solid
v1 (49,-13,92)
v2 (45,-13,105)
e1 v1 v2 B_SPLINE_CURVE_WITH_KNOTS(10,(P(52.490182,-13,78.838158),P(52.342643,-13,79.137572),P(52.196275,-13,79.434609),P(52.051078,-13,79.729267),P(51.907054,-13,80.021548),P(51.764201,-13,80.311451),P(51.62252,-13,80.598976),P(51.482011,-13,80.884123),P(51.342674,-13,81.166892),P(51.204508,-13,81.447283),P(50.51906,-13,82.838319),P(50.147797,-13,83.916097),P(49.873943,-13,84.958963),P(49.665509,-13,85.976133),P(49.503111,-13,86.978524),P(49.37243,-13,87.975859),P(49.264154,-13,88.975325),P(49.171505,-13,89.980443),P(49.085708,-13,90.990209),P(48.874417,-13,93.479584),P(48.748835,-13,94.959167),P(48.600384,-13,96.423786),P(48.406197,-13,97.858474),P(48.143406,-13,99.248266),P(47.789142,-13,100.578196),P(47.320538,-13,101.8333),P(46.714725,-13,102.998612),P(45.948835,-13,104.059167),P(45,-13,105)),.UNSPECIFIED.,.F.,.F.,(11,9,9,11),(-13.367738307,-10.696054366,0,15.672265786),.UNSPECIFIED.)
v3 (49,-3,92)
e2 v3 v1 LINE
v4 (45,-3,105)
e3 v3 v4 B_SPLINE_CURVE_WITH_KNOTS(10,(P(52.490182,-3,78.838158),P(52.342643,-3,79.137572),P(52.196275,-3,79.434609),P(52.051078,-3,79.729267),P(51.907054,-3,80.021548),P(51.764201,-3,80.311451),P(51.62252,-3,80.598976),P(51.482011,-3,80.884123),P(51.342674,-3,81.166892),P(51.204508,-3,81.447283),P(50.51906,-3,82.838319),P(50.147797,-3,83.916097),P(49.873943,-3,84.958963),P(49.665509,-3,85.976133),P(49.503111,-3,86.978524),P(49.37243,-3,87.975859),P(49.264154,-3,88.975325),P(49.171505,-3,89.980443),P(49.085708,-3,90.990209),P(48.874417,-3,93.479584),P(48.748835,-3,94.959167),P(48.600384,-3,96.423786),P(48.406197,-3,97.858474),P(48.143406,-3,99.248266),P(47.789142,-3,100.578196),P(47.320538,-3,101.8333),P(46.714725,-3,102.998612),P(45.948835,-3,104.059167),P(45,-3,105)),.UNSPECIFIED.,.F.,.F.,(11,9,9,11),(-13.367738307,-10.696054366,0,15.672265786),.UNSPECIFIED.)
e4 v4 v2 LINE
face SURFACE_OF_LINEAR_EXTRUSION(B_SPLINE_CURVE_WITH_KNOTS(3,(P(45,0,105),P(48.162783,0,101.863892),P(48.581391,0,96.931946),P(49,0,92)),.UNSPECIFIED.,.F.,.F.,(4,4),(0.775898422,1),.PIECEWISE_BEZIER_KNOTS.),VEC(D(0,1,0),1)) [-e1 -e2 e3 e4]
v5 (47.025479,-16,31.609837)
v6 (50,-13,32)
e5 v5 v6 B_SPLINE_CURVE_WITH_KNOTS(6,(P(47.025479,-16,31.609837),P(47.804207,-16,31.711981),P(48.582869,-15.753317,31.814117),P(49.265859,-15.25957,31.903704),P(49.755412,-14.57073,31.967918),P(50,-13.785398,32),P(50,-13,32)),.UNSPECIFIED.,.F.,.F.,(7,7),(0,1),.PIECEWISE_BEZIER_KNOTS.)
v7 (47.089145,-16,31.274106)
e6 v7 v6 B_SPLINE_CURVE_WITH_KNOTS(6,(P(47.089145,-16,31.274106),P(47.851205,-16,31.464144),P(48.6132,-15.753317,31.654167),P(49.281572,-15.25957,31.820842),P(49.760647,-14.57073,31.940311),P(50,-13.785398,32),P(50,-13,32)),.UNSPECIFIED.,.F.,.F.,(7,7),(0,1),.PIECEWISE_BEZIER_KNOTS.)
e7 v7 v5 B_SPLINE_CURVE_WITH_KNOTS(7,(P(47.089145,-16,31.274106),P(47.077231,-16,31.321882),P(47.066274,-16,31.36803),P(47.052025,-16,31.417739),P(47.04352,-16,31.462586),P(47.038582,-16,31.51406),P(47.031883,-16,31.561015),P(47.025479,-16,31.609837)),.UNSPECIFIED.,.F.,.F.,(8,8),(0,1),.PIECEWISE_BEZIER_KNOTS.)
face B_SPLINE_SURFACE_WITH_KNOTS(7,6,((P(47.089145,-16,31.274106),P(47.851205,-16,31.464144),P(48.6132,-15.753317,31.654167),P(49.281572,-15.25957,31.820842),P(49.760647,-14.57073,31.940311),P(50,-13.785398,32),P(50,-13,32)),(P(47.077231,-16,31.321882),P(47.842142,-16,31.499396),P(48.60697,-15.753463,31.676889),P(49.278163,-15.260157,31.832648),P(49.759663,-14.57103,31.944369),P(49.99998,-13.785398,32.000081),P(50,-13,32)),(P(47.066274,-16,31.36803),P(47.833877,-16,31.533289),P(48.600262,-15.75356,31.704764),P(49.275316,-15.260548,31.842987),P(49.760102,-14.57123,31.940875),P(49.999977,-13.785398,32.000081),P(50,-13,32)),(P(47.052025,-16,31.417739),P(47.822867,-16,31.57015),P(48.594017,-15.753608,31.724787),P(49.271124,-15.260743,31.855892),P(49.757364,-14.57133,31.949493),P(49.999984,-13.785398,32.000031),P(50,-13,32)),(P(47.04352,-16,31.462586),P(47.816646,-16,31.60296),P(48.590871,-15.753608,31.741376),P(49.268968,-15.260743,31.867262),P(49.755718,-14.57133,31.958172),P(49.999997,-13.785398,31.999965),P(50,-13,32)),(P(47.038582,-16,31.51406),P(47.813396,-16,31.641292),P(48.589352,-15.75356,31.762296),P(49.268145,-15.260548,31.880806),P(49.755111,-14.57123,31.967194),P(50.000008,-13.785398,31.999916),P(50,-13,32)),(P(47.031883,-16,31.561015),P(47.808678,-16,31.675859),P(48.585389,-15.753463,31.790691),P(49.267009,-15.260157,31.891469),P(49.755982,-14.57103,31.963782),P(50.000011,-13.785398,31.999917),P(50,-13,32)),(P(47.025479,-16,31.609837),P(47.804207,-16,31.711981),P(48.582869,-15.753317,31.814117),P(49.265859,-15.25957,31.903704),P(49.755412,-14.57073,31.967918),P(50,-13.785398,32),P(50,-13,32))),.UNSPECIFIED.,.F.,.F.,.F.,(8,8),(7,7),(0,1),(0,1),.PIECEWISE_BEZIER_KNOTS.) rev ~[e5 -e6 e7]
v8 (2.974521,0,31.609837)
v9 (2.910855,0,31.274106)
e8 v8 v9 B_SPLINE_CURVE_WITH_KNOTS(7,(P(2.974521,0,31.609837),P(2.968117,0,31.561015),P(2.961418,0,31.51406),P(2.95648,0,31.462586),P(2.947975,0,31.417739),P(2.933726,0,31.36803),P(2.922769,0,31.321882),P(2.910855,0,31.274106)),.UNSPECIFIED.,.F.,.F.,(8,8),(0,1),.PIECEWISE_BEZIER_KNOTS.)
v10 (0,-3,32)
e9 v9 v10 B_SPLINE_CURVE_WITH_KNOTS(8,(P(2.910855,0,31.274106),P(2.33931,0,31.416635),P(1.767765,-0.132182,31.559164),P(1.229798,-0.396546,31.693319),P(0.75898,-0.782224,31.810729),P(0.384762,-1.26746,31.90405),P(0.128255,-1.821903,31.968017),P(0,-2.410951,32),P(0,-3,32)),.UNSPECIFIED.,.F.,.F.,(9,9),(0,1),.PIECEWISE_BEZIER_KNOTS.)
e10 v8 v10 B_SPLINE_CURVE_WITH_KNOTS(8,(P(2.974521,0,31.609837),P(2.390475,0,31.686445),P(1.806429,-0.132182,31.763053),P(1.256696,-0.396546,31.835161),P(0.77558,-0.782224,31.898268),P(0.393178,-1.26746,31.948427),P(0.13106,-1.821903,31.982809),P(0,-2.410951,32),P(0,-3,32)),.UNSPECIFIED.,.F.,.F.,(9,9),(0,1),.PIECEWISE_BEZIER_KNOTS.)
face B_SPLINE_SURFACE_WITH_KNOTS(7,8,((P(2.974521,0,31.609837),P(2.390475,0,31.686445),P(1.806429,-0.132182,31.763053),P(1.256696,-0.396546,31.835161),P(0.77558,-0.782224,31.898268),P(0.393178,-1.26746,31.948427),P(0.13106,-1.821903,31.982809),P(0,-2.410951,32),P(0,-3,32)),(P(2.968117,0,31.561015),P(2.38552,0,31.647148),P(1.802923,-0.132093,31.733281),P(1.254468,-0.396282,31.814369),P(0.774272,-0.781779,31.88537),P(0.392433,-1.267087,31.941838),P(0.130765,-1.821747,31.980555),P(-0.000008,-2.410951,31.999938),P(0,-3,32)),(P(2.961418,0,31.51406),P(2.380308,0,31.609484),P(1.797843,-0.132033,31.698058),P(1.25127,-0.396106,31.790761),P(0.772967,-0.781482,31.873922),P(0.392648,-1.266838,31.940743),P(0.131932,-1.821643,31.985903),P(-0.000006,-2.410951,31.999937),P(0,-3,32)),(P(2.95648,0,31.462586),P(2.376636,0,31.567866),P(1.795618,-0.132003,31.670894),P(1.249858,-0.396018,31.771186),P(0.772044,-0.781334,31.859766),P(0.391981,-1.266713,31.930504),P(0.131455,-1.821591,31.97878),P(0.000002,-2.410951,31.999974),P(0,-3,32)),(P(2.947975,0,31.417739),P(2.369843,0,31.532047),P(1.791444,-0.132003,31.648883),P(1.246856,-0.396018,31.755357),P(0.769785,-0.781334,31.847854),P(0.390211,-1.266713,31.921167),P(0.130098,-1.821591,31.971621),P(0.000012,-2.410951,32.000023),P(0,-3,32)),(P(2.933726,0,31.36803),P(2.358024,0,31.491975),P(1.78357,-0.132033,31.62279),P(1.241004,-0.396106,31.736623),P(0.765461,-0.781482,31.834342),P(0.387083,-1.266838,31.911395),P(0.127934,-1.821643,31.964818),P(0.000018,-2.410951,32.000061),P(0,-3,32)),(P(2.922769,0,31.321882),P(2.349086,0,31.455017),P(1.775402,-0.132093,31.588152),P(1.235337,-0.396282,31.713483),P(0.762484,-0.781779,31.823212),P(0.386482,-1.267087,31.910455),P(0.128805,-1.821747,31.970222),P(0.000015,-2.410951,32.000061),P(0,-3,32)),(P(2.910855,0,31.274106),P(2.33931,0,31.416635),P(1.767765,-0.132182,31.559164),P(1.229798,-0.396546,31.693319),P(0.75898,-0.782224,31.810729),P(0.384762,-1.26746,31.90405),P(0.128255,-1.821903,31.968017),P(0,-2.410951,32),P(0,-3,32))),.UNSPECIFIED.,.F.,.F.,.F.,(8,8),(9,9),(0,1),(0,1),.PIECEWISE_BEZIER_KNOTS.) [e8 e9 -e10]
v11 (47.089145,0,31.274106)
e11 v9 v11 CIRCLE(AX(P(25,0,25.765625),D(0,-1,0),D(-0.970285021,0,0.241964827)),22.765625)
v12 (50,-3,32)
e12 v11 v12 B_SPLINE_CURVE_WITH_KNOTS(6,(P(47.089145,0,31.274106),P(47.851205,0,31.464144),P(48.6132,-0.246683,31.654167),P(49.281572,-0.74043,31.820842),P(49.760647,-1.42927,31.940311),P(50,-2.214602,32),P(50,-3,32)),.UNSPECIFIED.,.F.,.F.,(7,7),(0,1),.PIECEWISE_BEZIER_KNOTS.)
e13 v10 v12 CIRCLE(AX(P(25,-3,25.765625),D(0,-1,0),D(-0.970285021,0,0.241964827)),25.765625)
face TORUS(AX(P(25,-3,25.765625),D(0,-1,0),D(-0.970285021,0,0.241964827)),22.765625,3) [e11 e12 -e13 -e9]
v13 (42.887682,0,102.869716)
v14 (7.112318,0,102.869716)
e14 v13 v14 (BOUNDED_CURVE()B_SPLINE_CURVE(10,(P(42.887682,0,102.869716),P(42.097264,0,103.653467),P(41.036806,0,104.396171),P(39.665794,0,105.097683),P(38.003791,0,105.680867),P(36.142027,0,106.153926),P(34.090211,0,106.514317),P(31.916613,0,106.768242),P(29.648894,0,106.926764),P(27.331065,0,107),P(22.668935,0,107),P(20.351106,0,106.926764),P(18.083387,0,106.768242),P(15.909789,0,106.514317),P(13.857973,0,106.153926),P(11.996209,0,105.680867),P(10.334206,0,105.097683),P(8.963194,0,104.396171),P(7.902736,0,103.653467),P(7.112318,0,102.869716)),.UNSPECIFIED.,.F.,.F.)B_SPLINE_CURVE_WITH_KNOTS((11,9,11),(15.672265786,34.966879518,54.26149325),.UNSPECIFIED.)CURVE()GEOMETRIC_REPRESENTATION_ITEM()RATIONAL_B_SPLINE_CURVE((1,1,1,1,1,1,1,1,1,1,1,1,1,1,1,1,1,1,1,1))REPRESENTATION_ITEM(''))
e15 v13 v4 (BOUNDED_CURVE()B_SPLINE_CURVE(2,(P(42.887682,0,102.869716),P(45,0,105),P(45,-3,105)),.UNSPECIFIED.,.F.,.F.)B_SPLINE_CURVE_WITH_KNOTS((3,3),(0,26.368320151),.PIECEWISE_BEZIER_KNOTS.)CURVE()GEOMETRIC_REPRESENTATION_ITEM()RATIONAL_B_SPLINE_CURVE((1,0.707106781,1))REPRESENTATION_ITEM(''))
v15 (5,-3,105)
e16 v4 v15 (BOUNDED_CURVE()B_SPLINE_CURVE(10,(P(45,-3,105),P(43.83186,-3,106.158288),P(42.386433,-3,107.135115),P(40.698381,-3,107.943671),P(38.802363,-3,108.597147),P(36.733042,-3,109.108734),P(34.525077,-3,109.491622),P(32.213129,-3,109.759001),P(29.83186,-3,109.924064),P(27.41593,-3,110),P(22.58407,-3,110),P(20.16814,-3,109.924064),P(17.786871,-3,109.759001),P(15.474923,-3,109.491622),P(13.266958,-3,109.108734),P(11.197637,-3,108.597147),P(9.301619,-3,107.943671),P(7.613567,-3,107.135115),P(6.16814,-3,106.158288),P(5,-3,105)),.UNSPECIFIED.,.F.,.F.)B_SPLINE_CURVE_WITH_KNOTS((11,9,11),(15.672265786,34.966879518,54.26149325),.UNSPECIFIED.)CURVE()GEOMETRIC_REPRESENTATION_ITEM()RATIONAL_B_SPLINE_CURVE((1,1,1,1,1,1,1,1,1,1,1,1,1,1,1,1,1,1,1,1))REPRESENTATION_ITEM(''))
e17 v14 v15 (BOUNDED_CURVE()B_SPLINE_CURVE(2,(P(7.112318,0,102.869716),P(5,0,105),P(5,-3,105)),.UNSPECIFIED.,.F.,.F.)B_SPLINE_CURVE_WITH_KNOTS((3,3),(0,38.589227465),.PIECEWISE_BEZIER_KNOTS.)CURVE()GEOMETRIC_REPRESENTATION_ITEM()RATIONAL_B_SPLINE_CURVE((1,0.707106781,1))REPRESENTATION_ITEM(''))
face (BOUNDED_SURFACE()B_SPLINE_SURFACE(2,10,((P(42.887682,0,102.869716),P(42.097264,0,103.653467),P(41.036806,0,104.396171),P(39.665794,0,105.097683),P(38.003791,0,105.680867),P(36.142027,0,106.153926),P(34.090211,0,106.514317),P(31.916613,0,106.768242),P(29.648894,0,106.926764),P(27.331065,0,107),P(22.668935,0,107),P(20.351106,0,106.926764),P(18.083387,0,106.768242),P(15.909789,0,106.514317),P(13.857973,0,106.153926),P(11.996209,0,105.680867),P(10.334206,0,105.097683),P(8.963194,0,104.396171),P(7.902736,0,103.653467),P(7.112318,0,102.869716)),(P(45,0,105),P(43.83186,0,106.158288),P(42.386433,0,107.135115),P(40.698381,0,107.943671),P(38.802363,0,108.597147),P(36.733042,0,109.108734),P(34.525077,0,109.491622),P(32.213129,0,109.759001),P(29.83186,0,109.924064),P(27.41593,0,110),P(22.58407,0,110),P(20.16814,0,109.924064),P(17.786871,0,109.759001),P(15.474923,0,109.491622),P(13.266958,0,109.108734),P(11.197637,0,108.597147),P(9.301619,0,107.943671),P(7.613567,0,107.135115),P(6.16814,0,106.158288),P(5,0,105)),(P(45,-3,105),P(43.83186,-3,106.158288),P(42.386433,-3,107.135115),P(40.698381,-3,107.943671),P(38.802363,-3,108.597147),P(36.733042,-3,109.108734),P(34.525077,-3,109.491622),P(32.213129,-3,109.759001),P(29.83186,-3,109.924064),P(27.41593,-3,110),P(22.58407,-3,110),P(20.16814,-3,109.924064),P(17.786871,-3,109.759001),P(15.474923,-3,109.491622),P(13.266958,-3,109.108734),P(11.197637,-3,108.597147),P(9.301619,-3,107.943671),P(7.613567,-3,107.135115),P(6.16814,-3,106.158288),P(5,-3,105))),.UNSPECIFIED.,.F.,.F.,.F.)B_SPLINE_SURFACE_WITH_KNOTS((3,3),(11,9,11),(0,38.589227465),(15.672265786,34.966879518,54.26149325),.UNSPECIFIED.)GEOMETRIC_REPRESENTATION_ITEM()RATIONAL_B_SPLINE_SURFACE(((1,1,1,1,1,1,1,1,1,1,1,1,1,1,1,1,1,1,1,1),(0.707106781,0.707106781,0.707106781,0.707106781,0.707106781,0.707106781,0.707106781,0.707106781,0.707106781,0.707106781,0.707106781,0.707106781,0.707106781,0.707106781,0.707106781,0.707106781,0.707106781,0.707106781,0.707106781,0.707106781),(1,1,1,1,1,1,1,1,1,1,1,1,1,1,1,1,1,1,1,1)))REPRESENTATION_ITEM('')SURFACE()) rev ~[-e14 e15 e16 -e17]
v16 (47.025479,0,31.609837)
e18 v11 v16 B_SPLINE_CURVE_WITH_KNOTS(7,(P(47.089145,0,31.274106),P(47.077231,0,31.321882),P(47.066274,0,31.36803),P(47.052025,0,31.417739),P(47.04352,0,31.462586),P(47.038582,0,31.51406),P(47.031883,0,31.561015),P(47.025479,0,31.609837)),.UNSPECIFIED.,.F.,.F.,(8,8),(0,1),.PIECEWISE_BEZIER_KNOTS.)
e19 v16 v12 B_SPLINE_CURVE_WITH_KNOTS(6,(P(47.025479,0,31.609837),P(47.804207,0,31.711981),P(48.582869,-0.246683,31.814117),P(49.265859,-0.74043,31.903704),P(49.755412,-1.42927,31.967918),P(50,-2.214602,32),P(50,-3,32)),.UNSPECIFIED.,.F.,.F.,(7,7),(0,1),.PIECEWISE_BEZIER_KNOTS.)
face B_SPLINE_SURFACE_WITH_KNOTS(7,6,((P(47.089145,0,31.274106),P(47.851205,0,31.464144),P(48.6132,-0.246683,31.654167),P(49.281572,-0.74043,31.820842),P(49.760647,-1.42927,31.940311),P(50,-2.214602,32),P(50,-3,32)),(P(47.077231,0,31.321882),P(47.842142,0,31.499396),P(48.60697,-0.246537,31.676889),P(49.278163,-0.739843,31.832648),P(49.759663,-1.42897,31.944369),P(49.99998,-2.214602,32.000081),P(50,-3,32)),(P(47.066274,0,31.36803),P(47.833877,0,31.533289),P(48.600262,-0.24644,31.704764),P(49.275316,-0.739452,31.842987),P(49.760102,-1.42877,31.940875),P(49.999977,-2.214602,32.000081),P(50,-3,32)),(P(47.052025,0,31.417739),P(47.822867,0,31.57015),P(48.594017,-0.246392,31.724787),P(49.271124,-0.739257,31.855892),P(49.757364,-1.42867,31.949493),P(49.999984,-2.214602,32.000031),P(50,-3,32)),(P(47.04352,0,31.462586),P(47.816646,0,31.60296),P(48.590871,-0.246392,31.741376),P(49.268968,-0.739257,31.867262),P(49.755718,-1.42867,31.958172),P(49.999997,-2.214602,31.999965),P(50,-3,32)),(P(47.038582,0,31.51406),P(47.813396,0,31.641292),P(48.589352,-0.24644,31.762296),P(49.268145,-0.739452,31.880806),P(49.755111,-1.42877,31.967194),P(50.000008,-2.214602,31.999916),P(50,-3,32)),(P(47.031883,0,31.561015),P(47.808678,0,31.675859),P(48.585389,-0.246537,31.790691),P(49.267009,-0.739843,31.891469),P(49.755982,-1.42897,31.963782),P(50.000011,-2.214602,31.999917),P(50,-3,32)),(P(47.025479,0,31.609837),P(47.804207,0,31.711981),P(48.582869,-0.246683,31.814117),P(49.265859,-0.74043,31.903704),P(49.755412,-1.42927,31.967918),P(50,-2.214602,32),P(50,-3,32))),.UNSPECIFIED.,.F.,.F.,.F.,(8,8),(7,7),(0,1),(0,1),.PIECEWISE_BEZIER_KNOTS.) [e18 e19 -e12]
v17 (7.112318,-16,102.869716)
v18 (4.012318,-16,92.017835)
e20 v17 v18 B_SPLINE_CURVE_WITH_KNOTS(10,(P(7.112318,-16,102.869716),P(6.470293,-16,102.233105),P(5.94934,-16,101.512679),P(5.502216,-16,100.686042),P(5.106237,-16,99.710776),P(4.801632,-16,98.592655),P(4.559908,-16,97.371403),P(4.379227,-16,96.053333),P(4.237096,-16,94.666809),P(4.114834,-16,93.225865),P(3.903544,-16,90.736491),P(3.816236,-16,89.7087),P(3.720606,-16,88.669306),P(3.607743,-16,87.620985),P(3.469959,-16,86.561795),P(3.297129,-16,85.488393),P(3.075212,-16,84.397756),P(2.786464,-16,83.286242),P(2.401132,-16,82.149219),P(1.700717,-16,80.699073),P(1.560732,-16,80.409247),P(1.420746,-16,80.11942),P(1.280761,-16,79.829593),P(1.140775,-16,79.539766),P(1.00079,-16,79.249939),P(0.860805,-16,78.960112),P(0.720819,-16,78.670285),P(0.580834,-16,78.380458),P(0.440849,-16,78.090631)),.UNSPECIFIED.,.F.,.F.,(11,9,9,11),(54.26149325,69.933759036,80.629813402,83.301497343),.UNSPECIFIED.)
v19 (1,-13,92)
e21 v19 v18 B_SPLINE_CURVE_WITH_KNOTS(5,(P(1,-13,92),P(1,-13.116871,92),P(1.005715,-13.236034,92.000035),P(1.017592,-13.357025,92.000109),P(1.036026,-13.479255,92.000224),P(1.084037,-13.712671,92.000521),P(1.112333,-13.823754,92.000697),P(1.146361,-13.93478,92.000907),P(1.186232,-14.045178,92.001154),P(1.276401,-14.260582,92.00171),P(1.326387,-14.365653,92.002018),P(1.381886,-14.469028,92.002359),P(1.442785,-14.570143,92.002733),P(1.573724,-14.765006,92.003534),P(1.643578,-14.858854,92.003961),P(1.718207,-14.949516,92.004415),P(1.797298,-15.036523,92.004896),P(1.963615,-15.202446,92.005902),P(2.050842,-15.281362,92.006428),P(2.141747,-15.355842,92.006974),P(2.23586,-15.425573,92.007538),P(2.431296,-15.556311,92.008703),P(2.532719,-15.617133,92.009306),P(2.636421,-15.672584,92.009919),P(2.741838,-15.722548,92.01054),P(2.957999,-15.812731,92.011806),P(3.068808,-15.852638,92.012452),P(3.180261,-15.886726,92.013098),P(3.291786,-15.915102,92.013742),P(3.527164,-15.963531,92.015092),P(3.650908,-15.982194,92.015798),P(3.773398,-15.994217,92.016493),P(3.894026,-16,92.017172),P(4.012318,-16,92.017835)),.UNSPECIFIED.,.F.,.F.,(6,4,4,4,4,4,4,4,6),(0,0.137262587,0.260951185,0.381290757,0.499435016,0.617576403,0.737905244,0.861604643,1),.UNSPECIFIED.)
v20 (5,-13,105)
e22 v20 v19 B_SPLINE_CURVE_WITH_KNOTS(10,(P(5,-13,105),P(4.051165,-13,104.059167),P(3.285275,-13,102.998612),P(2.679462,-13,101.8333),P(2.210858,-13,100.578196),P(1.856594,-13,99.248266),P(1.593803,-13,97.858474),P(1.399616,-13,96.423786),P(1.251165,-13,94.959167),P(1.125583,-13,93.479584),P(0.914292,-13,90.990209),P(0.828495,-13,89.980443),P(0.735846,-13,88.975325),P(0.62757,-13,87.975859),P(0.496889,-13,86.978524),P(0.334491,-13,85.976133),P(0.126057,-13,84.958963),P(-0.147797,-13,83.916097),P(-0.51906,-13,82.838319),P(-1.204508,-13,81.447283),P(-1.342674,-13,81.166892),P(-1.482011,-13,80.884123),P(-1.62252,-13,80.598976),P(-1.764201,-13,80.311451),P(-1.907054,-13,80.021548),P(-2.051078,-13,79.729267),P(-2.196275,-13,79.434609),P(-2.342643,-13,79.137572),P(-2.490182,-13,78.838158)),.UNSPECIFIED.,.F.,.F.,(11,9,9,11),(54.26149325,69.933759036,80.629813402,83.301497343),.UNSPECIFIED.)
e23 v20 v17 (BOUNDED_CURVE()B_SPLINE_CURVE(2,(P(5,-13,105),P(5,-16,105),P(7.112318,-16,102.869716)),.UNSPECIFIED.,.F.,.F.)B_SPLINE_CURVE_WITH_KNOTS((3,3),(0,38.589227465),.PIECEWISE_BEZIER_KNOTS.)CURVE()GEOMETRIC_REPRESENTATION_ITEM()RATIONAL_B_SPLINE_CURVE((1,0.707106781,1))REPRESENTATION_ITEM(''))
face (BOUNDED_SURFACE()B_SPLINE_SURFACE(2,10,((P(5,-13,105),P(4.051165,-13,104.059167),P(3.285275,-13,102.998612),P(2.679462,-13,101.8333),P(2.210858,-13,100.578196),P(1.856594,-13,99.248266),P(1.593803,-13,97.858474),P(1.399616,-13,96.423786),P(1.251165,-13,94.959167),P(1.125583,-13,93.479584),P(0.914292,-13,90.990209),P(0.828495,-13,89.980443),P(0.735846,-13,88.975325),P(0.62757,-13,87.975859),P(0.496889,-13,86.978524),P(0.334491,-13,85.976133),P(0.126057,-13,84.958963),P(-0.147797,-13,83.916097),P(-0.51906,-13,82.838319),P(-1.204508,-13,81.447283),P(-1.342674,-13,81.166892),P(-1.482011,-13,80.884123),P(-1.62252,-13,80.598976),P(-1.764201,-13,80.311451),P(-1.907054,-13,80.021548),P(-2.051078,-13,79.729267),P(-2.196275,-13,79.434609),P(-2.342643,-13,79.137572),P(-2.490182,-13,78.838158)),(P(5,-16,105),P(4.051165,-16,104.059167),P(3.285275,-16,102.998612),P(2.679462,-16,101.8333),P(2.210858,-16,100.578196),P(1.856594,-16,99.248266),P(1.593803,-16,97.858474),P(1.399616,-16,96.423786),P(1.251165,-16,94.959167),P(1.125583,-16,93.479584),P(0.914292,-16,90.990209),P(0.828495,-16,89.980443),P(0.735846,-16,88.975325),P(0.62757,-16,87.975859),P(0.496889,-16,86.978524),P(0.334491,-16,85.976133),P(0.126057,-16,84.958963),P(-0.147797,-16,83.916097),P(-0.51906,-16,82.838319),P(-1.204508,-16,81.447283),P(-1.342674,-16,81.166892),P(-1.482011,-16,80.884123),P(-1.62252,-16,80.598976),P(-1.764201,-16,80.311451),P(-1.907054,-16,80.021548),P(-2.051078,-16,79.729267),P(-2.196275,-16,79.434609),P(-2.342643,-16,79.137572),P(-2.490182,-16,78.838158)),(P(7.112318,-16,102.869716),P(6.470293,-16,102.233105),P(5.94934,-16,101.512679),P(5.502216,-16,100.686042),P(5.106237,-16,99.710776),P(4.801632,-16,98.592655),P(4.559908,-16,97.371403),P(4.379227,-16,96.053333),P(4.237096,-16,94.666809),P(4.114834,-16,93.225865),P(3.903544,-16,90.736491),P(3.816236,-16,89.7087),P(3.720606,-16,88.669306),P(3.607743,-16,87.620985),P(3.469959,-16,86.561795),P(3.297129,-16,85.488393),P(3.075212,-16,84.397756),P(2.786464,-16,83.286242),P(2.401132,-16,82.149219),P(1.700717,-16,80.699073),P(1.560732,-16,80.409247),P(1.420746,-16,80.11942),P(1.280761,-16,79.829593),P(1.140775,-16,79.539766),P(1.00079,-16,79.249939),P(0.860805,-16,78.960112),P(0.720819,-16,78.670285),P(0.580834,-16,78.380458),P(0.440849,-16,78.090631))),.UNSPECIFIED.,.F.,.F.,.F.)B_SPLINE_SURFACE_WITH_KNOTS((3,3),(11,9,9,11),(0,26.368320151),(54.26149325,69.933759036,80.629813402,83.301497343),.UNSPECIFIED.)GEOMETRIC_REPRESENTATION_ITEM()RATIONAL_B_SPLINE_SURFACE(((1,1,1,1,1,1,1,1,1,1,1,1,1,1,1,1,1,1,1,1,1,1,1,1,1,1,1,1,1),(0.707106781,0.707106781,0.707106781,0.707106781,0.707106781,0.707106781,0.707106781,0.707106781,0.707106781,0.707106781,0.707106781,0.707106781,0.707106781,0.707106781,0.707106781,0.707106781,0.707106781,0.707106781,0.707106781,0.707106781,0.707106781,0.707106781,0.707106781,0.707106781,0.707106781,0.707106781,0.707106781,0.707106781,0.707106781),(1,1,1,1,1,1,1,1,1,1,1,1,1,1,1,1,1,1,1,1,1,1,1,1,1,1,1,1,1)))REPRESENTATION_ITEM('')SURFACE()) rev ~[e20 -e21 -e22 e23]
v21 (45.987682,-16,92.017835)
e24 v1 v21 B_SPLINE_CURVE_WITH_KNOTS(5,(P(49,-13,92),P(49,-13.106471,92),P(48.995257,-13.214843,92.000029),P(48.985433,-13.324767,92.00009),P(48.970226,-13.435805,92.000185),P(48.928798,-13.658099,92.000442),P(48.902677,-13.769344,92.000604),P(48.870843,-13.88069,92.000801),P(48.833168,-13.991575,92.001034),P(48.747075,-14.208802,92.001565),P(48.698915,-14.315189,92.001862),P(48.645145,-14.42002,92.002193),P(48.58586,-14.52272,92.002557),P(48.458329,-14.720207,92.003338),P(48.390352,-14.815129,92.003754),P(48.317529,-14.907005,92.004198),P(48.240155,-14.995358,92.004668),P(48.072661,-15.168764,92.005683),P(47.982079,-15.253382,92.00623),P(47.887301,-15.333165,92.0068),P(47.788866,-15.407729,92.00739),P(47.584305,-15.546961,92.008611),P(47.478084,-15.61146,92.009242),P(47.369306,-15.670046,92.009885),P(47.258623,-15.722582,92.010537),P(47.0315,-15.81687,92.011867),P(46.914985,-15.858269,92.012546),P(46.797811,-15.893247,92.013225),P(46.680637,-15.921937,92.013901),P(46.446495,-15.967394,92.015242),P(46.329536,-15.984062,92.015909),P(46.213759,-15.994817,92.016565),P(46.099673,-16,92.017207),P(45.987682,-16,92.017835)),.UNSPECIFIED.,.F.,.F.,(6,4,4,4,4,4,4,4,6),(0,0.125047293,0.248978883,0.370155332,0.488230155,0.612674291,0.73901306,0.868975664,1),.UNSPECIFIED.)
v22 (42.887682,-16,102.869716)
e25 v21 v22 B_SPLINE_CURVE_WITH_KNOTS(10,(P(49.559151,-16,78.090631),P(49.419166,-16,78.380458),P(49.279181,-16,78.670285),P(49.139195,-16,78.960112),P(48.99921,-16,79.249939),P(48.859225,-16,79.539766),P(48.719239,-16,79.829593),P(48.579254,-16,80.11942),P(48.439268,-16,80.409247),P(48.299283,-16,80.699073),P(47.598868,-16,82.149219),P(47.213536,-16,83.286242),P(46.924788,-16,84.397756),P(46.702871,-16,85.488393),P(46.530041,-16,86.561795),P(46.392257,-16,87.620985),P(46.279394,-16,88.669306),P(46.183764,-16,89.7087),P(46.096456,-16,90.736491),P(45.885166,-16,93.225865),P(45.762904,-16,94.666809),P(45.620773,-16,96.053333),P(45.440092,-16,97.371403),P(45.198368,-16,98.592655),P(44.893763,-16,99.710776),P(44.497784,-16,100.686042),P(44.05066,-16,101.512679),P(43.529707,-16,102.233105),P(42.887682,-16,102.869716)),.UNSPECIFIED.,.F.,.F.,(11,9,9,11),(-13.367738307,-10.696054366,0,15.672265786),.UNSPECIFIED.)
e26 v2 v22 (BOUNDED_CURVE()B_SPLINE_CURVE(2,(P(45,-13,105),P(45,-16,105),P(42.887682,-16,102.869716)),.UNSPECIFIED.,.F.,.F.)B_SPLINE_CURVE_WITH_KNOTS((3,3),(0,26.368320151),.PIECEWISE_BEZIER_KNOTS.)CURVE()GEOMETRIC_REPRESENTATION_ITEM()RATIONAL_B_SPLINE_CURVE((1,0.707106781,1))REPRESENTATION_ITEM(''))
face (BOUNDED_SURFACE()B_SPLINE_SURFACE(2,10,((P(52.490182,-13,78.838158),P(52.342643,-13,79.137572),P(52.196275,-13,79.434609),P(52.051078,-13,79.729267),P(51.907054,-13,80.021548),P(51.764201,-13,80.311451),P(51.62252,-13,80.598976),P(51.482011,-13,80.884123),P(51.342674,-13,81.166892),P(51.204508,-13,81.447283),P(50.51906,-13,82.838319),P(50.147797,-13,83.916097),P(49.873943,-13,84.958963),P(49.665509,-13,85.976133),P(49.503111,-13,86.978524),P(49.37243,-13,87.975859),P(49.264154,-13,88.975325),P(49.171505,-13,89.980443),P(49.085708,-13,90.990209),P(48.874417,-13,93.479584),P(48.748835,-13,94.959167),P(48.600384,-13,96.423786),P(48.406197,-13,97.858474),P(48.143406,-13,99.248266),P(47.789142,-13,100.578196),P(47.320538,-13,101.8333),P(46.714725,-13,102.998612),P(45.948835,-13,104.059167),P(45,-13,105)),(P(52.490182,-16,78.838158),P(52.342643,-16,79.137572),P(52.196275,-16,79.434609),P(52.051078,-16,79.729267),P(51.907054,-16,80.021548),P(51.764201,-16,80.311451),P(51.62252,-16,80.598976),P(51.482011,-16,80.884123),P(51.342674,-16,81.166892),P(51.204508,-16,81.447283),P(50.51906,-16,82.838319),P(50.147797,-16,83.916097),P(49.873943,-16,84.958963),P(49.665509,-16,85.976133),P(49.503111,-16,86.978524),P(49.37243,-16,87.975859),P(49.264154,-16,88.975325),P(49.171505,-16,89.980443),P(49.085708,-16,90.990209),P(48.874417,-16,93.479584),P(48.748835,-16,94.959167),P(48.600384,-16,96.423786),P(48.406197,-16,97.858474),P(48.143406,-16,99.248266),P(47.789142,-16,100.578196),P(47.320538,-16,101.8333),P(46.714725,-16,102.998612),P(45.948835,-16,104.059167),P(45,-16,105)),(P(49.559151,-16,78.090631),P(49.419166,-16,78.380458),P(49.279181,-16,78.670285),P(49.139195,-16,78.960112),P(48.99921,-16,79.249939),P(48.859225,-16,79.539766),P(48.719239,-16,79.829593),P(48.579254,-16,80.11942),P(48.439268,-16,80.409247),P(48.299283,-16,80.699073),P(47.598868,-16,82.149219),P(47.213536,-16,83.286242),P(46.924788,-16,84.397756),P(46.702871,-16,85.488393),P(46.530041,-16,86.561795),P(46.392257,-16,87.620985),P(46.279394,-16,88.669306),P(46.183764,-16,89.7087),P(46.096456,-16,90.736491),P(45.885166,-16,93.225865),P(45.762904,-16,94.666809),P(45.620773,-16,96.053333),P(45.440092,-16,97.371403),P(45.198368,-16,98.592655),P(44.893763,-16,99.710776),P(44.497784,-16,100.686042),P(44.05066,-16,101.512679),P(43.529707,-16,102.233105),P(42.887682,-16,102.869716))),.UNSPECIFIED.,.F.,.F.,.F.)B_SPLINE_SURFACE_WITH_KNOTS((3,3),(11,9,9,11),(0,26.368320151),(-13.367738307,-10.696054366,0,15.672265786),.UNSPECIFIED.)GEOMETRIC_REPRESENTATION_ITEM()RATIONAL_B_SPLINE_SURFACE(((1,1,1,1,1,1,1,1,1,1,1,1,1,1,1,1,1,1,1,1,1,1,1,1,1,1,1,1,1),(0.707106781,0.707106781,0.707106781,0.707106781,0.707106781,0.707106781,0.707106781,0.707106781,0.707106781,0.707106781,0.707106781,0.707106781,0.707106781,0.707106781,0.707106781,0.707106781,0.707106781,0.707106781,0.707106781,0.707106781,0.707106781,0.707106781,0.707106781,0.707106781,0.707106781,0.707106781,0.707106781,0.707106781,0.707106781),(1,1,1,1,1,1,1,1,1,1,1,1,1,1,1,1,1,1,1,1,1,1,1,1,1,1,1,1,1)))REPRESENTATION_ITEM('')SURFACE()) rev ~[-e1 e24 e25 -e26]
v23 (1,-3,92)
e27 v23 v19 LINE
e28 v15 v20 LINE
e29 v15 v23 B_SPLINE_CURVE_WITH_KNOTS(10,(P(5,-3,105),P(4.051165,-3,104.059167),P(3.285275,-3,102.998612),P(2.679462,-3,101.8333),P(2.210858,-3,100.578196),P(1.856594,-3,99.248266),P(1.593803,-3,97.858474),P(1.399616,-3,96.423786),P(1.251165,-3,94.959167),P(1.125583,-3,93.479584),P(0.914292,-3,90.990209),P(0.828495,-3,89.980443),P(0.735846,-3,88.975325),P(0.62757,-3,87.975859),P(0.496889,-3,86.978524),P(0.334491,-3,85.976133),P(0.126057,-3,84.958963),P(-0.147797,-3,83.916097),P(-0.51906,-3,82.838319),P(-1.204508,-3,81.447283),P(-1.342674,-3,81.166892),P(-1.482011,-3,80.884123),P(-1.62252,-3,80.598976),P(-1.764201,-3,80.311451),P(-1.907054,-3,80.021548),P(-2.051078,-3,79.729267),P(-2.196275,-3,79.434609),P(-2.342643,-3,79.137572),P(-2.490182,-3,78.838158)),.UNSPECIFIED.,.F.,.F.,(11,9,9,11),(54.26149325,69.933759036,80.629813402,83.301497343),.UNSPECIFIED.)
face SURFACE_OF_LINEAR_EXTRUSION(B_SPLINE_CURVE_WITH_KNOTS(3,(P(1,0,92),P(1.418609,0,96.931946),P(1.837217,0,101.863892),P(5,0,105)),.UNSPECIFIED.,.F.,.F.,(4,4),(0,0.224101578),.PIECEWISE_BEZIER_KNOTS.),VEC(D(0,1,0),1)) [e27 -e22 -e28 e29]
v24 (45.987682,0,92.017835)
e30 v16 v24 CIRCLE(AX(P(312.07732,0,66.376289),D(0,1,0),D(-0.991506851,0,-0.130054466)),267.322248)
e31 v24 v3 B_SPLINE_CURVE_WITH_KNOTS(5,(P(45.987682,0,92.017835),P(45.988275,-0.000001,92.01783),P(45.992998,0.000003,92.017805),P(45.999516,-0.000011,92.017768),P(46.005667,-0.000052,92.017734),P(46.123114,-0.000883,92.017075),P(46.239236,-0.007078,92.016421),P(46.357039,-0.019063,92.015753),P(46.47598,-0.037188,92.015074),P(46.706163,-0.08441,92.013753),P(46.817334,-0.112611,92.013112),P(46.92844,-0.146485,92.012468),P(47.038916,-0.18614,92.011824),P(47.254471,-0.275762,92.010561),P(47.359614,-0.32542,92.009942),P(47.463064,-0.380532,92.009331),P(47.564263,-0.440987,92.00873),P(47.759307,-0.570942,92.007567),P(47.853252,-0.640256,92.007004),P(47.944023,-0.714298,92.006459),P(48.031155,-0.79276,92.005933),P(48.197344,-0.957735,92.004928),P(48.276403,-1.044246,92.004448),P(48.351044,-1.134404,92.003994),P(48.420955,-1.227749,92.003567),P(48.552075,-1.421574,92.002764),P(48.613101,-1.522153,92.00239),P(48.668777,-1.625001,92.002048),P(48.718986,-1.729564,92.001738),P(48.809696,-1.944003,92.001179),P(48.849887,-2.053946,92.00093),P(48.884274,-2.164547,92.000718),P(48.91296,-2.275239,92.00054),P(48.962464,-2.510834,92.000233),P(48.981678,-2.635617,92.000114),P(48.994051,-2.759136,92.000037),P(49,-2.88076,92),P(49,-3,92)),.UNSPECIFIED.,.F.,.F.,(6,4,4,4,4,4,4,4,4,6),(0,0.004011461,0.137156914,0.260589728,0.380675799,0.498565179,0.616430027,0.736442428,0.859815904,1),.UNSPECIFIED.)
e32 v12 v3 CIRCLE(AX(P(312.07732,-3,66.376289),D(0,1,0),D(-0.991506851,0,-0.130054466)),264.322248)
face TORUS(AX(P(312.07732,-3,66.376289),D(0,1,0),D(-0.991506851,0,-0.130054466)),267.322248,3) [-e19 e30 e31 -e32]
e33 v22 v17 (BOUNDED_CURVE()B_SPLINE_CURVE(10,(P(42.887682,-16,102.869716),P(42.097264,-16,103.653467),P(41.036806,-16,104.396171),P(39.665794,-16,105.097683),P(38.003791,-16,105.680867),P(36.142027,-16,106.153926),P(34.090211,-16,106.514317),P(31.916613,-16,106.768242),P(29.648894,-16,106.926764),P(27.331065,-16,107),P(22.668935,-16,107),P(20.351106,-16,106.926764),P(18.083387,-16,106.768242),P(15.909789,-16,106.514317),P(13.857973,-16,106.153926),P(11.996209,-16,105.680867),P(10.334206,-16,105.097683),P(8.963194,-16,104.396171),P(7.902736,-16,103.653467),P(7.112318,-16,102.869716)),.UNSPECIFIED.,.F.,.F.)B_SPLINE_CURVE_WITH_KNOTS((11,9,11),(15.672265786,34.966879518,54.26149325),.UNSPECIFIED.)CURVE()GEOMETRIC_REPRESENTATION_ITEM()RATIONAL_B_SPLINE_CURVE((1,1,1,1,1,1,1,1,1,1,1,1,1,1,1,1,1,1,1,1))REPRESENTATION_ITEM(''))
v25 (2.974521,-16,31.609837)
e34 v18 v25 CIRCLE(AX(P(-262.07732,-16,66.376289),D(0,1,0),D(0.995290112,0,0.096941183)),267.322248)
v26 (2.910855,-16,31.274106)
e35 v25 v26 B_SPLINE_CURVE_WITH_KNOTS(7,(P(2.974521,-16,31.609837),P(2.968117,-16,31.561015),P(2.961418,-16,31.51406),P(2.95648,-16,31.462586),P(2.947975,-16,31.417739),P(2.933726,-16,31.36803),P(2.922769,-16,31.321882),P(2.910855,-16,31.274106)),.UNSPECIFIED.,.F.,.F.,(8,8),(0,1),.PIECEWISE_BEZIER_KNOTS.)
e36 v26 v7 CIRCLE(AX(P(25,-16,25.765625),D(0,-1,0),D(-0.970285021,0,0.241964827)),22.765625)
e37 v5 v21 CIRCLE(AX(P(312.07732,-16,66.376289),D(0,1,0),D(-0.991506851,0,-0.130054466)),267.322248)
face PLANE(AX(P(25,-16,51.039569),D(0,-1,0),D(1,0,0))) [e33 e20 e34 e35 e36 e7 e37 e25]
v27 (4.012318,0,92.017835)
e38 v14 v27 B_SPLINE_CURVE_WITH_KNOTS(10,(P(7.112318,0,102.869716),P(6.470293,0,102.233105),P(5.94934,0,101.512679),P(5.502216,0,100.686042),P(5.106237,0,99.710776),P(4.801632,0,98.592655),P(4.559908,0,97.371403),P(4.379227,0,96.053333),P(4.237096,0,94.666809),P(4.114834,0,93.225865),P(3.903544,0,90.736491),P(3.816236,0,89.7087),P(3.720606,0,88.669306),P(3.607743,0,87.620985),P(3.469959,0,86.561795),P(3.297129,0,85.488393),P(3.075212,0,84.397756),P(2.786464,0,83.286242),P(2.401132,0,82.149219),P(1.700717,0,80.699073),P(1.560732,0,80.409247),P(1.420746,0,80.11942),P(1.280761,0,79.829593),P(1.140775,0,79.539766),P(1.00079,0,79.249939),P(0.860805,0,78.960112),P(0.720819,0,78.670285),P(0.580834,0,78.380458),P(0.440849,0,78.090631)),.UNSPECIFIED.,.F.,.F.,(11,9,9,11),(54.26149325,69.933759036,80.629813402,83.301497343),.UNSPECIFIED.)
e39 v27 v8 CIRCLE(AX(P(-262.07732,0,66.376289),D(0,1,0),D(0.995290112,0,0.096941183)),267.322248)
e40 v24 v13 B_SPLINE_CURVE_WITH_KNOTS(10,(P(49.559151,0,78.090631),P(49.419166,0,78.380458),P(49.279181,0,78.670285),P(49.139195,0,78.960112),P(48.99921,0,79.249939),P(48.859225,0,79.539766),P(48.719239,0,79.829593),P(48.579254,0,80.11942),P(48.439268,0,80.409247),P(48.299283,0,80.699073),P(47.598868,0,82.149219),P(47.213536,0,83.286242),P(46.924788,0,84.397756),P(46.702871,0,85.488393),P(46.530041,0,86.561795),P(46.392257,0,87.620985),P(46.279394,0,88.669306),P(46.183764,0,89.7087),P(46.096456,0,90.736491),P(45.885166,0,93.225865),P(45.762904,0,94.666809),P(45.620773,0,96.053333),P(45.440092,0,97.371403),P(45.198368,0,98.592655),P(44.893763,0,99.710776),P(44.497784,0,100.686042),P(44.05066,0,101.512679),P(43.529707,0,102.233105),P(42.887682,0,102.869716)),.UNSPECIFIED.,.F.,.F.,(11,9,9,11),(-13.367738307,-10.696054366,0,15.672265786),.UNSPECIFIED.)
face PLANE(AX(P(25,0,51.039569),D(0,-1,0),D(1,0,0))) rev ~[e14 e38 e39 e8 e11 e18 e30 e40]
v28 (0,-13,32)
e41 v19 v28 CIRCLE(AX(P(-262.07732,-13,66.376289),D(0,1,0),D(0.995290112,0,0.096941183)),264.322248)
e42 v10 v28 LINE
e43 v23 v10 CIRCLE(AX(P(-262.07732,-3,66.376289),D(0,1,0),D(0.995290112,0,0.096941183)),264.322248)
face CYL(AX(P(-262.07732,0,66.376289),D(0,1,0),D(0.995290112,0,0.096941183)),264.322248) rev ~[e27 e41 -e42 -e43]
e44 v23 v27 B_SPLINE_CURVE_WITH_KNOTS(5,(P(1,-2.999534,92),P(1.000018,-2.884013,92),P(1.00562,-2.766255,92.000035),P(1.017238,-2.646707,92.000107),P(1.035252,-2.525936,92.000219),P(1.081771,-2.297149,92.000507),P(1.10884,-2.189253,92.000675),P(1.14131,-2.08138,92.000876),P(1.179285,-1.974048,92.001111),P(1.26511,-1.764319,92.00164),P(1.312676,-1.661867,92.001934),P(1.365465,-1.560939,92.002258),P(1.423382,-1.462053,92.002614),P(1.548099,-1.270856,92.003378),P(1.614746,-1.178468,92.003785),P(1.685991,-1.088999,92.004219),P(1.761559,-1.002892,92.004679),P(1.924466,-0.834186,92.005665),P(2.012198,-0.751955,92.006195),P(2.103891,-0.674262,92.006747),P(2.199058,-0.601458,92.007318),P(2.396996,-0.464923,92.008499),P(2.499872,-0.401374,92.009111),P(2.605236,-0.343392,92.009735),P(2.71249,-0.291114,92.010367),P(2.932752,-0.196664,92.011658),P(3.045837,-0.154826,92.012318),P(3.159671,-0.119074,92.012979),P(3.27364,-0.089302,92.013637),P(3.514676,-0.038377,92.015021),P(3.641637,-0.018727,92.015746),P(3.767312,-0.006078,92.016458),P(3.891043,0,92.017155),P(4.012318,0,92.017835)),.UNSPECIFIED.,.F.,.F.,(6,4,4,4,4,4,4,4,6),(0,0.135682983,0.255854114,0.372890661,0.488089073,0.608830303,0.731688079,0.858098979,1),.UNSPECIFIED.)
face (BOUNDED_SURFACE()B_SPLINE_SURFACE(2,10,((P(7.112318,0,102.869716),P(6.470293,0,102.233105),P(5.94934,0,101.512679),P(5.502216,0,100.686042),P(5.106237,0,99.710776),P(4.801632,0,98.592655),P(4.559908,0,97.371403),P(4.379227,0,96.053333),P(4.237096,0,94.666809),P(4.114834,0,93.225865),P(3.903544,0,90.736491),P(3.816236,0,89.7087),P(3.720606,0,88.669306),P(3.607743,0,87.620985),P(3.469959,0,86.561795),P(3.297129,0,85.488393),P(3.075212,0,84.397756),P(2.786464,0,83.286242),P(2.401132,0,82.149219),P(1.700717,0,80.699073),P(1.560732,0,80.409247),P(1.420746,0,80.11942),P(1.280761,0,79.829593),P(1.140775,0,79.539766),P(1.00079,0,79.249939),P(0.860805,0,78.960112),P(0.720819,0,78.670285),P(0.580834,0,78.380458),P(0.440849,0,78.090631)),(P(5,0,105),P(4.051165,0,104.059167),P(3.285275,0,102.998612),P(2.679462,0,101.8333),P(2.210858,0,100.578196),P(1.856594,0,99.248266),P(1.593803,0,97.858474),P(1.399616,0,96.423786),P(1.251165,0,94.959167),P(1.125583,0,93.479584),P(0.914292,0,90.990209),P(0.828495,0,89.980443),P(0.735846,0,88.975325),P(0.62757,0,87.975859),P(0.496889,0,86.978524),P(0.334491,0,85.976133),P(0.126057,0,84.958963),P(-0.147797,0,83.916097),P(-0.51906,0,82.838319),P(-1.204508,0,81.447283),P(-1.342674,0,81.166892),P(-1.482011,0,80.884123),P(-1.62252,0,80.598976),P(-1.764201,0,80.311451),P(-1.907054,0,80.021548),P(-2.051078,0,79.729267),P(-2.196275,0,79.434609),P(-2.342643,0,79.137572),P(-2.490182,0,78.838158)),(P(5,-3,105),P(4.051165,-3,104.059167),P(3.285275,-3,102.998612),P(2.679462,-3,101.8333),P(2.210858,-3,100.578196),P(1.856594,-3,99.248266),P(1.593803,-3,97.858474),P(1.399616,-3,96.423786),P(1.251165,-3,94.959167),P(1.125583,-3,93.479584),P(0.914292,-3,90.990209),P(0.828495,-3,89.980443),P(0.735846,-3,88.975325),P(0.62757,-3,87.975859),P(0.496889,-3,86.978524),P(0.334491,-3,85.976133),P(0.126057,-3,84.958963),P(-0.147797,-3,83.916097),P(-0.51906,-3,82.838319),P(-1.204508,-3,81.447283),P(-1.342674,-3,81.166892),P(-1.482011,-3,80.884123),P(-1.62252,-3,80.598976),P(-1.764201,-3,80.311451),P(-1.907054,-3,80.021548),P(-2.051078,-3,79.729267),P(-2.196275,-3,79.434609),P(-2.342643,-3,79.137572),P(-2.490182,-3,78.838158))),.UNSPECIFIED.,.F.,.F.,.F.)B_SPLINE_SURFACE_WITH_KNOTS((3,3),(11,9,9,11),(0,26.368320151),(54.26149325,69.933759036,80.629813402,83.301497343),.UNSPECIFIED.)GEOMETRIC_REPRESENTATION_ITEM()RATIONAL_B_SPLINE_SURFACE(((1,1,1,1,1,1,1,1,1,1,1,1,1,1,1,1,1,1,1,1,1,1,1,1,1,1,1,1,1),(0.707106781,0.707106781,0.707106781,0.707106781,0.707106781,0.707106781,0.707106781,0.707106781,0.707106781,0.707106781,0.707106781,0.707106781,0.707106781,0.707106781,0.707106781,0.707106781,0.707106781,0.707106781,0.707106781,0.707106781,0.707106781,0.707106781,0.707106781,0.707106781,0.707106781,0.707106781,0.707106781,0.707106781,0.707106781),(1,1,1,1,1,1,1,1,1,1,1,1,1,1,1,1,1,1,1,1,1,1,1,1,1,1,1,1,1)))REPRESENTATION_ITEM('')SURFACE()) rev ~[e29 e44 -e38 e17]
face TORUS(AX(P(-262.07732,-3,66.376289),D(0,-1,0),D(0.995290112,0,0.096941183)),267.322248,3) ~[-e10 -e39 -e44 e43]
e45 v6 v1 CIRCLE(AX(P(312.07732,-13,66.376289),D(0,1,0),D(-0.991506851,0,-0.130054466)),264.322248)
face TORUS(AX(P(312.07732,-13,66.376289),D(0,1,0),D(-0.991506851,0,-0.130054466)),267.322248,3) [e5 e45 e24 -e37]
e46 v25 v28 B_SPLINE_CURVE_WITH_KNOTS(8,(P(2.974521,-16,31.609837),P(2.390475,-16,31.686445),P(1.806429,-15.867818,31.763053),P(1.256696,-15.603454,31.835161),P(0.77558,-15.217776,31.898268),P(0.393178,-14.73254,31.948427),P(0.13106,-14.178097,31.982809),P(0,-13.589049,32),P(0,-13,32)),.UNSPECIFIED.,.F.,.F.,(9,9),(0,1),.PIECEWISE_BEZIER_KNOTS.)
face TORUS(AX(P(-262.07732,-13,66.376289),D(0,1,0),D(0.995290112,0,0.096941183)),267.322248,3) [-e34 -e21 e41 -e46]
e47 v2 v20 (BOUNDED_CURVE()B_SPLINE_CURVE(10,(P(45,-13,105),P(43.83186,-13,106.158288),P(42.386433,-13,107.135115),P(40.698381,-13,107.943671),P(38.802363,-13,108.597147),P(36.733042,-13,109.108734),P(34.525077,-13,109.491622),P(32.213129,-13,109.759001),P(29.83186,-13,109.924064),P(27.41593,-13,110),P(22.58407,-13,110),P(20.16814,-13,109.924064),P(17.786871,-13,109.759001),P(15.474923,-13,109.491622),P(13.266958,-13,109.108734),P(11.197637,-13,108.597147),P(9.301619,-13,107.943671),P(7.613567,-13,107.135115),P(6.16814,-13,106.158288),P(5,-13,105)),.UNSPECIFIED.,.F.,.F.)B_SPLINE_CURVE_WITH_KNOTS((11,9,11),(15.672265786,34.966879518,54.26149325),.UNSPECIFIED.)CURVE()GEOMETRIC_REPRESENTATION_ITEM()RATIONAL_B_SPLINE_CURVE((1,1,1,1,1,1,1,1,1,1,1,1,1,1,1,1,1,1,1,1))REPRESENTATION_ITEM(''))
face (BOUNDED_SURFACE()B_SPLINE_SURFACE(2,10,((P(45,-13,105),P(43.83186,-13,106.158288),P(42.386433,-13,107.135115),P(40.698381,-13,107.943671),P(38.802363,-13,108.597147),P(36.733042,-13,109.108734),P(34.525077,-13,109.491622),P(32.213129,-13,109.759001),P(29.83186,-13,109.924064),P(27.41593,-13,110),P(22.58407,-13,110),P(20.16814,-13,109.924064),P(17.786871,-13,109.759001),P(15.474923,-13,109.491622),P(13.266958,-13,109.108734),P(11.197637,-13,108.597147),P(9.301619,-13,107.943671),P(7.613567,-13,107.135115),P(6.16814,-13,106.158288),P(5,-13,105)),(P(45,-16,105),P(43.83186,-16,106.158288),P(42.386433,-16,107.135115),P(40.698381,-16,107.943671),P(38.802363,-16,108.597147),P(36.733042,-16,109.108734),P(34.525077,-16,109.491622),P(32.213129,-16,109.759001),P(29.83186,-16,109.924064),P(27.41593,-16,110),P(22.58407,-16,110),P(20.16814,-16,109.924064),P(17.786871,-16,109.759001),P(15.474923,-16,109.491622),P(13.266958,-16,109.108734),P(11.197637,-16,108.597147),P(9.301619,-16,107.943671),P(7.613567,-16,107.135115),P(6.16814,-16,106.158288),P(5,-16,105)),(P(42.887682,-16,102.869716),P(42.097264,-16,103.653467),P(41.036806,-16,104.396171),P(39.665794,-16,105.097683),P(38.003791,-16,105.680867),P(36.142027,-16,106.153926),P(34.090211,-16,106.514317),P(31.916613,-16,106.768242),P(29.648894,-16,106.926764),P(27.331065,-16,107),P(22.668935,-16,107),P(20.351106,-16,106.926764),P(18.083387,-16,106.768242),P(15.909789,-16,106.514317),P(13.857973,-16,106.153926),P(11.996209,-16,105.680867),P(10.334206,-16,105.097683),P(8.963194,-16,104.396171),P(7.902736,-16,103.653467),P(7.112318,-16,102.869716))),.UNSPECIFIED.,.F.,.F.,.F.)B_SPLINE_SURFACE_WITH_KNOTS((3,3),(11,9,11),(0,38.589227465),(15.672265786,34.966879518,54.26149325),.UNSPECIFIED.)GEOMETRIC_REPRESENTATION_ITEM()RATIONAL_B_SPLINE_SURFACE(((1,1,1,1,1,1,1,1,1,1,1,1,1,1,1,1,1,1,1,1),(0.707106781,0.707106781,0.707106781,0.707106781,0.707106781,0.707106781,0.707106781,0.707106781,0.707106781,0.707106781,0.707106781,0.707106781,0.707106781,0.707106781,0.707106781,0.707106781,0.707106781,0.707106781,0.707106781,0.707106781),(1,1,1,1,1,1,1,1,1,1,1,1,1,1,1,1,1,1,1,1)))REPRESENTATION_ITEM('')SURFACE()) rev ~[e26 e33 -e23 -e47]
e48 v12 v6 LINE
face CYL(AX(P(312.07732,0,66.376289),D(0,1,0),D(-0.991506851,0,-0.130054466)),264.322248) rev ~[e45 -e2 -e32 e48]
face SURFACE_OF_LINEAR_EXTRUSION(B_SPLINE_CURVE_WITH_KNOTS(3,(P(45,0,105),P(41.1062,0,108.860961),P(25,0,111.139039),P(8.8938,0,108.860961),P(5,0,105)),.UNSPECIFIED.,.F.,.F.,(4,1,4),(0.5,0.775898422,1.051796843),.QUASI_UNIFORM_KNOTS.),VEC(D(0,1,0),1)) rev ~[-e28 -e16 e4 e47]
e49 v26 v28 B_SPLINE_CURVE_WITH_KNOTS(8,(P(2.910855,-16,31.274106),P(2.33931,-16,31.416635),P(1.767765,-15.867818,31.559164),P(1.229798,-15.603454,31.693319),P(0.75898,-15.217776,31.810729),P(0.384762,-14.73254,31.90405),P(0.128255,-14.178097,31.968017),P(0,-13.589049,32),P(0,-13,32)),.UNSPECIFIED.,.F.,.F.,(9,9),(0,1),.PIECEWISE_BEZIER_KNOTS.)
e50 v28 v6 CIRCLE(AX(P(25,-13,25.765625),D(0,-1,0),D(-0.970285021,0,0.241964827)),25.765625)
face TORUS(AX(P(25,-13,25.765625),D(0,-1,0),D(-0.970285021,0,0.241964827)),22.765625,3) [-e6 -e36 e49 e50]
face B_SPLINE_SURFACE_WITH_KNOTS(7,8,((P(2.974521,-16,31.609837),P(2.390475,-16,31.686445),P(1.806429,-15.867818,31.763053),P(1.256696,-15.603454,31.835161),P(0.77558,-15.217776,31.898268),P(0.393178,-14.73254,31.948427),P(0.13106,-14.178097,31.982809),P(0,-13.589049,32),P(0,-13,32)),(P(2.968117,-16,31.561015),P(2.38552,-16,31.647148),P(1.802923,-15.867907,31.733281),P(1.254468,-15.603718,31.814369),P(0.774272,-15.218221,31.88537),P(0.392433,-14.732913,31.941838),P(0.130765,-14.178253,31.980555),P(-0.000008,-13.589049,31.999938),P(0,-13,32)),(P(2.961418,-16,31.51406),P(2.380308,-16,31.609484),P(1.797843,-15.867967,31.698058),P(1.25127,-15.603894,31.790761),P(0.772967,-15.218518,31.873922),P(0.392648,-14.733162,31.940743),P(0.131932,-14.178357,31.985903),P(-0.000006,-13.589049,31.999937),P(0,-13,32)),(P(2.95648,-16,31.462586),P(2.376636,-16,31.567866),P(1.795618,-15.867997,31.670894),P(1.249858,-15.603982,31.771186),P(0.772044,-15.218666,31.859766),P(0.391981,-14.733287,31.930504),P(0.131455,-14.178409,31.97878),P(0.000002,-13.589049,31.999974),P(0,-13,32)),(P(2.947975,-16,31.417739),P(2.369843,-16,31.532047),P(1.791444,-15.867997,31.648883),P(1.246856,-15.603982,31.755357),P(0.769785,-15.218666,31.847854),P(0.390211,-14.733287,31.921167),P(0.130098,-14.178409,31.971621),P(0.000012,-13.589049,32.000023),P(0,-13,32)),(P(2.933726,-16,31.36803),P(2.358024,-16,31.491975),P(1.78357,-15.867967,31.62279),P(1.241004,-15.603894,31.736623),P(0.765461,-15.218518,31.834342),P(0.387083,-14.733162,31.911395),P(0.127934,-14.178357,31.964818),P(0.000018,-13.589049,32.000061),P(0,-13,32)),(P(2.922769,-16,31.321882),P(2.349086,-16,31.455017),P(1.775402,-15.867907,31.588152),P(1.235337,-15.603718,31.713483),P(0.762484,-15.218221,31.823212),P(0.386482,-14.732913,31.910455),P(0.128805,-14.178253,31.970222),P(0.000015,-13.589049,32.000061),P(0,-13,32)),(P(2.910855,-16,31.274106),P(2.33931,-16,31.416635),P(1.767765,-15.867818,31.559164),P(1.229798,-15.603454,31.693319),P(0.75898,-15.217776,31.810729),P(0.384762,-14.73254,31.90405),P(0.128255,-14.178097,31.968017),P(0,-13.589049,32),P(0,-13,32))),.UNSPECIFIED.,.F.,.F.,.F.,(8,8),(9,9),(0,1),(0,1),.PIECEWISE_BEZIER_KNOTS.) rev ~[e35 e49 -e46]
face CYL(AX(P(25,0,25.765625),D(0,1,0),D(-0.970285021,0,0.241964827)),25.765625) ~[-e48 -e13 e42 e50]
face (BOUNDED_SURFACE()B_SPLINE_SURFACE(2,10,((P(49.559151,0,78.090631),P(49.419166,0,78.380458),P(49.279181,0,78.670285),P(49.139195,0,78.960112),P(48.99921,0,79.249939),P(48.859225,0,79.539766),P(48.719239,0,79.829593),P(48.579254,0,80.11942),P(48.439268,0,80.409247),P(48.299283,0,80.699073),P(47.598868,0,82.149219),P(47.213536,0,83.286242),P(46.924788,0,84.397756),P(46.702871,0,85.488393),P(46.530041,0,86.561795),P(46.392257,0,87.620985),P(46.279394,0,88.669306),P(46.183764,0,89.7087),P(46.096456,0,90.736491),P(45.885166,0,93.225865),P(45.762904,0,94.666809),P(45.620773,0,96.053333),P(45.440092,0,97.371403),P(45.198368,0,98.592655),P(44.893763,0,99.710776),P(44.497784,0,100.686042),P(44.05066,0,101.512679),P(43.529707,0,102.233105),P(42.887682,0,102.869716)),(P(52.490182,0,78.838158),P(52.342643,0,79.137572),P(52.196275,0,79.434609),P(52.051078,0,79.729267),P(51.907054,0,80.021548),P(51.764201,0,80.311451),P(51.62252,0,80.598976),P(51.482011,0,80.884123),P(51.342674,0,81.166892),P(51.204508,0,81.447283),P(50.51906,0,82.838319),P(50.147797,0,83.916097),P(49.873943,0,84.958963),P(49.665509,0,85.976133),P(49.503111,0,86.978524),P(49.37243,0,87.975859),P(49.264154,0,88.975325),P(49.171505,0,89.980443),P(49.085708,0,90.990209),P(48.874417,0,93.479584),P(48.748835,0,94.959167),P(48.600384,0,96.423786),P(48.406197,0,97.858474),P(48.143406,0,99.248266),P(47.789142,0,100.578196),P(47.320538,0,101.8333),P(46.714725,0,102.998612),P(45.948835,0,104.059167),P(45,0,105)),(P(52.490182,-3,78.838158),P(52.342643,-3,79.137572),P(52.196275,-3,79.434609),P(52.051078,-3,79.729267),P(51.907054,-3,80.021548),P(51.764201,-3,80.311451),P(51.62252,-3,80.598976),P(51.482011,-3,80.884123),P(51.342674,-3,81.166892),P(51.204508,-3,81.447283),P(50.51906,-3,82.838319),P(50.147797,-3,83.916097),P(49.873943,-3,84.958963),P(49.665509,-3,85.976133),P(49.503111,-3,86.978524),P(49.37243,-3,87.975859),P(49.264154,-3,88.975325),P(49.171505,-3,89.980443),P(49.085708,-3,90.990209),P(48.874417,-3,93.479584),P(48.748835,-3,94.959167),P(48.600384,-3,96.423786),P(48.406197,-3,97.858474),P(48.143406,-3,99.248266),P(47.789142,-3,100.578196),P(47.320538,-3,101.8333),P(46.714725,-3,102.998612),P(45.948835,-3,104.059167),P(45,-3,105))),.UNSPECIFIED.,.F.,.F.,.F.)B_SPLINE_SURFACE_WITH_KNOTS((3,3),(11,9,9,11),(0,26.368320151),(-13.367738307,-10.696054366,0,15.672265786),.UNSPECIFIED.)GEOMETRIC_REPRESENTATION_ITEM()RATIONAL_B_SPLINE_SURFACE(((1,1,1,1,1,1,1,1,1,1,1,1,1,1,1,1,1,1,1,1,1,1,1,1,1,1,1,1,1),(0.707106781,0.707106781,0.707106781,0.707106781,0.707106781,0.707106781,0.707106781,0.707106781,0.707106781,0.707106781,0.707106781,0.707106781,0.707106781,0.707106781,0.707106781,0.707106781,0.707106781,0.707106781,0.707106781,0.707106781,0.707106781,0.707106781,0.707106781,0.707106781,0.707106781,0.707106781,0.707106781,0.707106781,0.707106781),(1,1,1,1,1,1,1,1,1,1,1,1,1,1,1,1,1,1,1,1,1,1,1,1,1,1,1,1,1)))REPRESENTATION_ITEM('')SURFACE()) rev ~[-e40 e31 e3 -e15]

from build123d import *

# Parameters (mm, degrees)
F1_DEPTH = 16
F2_R     = 3
F3_R     = 3


with BuildPart() as f1:
    # F0 (on Front) → F1 (new body)
    with BuildSketch(Plane.XZ):
        with BuildLine():
            ThreePointArc((1, 92), (2.2082244019, 61.9715295933), (0, 32))
            ThreePointArc((0, 32), (25, 0), (50, 32))
            ThreePointArc((50, 32), (47.7917755981, 61.9715295933), (49, 92))
            Line((49, 92), (25, 92))
            Line((25, 92), (1, 92))
        make_face()
        with BuildLine():
            add(Edge.make_bspline(
                [(1, 92), (1.4186086824, 96.9319457504), (1.8372173648, 101.8638915008), (5, 105)],
                knots=[0, 0, 0, 0, 0.2241015784, 0.2241015784, 0.2241015784, 0.2241015784], degree=3))
            Line((1, 92), (25, 92))
            Line((25, 92), (25, 105))
            Line((25, 105), (5, 105))
        make_face()
        with BuildLine():
            Line((25, 92), (49, 92))
            add(Edge.make_bspline(
                [(45, 105), (48.1627826352, 101.8638915008), (48.5813913176, 96.9319457504), (49, 92)],
                knots=[0.7758984216, 0.7758984216, 0.7758984216, 0.7758984216, 1, 1, 1, 1], degree=3))
            Line((45, 105), (25, 105))
            Line((25, 105), (25, 92))
        make_face()
        with BuildLine():
            add(Edge.make_bspline(
                [(5, 105), (8.8938000478, 108.8609606896), (16.9469000239, 110), (25, 110)],
                knots=[0.2241015784, 0.2241015784, 0.2241015784, 0.2241015784, 0.5, 0.5, 0.5, 0.5], degree=3))
            Line((5, 105), (25, 105))
            Line((25, 105), (25, 110))
        make_face()
        with BuildLine():
            Line((25, 105), (45, 105))
            add(Edge.make_bspline(
                [(25, 110), (33.0530999761, 110), (41.1061999522, 108.8609606896), (45, 105)],
                knots=[0.5, 0.5, 0.5, 0.5, 0.7758984216, 0.7758984216, 0.7758984216, 0.7758984216], degree=3))
            Line((25, 110), (25, 105))
        make_face()
    extrude(amount=F1_DEPTH)

    # F2
    f2_edges = [f1.edges().sort_by_distance(p)[0] for p in [
        (2.208224, -16, 61.97153),
        (25, -16, 0),
        (47.791776, -16, 61.97153),
        (25, -16, 110),
    ]]
    fillet(f2_edges, radius=F2_R)

    # F3
    f3_edges = [f1.edges().sort_by_distance(p)[0] for p in [
        (2.208224, 0, 61.97153),
        (25, 0, 0),
        (47.791776, 0, 61.97153),
        (25, 0, 110),
    ]]
    fillet(f3_edges, radius=F3_R)


solid = f1.part
